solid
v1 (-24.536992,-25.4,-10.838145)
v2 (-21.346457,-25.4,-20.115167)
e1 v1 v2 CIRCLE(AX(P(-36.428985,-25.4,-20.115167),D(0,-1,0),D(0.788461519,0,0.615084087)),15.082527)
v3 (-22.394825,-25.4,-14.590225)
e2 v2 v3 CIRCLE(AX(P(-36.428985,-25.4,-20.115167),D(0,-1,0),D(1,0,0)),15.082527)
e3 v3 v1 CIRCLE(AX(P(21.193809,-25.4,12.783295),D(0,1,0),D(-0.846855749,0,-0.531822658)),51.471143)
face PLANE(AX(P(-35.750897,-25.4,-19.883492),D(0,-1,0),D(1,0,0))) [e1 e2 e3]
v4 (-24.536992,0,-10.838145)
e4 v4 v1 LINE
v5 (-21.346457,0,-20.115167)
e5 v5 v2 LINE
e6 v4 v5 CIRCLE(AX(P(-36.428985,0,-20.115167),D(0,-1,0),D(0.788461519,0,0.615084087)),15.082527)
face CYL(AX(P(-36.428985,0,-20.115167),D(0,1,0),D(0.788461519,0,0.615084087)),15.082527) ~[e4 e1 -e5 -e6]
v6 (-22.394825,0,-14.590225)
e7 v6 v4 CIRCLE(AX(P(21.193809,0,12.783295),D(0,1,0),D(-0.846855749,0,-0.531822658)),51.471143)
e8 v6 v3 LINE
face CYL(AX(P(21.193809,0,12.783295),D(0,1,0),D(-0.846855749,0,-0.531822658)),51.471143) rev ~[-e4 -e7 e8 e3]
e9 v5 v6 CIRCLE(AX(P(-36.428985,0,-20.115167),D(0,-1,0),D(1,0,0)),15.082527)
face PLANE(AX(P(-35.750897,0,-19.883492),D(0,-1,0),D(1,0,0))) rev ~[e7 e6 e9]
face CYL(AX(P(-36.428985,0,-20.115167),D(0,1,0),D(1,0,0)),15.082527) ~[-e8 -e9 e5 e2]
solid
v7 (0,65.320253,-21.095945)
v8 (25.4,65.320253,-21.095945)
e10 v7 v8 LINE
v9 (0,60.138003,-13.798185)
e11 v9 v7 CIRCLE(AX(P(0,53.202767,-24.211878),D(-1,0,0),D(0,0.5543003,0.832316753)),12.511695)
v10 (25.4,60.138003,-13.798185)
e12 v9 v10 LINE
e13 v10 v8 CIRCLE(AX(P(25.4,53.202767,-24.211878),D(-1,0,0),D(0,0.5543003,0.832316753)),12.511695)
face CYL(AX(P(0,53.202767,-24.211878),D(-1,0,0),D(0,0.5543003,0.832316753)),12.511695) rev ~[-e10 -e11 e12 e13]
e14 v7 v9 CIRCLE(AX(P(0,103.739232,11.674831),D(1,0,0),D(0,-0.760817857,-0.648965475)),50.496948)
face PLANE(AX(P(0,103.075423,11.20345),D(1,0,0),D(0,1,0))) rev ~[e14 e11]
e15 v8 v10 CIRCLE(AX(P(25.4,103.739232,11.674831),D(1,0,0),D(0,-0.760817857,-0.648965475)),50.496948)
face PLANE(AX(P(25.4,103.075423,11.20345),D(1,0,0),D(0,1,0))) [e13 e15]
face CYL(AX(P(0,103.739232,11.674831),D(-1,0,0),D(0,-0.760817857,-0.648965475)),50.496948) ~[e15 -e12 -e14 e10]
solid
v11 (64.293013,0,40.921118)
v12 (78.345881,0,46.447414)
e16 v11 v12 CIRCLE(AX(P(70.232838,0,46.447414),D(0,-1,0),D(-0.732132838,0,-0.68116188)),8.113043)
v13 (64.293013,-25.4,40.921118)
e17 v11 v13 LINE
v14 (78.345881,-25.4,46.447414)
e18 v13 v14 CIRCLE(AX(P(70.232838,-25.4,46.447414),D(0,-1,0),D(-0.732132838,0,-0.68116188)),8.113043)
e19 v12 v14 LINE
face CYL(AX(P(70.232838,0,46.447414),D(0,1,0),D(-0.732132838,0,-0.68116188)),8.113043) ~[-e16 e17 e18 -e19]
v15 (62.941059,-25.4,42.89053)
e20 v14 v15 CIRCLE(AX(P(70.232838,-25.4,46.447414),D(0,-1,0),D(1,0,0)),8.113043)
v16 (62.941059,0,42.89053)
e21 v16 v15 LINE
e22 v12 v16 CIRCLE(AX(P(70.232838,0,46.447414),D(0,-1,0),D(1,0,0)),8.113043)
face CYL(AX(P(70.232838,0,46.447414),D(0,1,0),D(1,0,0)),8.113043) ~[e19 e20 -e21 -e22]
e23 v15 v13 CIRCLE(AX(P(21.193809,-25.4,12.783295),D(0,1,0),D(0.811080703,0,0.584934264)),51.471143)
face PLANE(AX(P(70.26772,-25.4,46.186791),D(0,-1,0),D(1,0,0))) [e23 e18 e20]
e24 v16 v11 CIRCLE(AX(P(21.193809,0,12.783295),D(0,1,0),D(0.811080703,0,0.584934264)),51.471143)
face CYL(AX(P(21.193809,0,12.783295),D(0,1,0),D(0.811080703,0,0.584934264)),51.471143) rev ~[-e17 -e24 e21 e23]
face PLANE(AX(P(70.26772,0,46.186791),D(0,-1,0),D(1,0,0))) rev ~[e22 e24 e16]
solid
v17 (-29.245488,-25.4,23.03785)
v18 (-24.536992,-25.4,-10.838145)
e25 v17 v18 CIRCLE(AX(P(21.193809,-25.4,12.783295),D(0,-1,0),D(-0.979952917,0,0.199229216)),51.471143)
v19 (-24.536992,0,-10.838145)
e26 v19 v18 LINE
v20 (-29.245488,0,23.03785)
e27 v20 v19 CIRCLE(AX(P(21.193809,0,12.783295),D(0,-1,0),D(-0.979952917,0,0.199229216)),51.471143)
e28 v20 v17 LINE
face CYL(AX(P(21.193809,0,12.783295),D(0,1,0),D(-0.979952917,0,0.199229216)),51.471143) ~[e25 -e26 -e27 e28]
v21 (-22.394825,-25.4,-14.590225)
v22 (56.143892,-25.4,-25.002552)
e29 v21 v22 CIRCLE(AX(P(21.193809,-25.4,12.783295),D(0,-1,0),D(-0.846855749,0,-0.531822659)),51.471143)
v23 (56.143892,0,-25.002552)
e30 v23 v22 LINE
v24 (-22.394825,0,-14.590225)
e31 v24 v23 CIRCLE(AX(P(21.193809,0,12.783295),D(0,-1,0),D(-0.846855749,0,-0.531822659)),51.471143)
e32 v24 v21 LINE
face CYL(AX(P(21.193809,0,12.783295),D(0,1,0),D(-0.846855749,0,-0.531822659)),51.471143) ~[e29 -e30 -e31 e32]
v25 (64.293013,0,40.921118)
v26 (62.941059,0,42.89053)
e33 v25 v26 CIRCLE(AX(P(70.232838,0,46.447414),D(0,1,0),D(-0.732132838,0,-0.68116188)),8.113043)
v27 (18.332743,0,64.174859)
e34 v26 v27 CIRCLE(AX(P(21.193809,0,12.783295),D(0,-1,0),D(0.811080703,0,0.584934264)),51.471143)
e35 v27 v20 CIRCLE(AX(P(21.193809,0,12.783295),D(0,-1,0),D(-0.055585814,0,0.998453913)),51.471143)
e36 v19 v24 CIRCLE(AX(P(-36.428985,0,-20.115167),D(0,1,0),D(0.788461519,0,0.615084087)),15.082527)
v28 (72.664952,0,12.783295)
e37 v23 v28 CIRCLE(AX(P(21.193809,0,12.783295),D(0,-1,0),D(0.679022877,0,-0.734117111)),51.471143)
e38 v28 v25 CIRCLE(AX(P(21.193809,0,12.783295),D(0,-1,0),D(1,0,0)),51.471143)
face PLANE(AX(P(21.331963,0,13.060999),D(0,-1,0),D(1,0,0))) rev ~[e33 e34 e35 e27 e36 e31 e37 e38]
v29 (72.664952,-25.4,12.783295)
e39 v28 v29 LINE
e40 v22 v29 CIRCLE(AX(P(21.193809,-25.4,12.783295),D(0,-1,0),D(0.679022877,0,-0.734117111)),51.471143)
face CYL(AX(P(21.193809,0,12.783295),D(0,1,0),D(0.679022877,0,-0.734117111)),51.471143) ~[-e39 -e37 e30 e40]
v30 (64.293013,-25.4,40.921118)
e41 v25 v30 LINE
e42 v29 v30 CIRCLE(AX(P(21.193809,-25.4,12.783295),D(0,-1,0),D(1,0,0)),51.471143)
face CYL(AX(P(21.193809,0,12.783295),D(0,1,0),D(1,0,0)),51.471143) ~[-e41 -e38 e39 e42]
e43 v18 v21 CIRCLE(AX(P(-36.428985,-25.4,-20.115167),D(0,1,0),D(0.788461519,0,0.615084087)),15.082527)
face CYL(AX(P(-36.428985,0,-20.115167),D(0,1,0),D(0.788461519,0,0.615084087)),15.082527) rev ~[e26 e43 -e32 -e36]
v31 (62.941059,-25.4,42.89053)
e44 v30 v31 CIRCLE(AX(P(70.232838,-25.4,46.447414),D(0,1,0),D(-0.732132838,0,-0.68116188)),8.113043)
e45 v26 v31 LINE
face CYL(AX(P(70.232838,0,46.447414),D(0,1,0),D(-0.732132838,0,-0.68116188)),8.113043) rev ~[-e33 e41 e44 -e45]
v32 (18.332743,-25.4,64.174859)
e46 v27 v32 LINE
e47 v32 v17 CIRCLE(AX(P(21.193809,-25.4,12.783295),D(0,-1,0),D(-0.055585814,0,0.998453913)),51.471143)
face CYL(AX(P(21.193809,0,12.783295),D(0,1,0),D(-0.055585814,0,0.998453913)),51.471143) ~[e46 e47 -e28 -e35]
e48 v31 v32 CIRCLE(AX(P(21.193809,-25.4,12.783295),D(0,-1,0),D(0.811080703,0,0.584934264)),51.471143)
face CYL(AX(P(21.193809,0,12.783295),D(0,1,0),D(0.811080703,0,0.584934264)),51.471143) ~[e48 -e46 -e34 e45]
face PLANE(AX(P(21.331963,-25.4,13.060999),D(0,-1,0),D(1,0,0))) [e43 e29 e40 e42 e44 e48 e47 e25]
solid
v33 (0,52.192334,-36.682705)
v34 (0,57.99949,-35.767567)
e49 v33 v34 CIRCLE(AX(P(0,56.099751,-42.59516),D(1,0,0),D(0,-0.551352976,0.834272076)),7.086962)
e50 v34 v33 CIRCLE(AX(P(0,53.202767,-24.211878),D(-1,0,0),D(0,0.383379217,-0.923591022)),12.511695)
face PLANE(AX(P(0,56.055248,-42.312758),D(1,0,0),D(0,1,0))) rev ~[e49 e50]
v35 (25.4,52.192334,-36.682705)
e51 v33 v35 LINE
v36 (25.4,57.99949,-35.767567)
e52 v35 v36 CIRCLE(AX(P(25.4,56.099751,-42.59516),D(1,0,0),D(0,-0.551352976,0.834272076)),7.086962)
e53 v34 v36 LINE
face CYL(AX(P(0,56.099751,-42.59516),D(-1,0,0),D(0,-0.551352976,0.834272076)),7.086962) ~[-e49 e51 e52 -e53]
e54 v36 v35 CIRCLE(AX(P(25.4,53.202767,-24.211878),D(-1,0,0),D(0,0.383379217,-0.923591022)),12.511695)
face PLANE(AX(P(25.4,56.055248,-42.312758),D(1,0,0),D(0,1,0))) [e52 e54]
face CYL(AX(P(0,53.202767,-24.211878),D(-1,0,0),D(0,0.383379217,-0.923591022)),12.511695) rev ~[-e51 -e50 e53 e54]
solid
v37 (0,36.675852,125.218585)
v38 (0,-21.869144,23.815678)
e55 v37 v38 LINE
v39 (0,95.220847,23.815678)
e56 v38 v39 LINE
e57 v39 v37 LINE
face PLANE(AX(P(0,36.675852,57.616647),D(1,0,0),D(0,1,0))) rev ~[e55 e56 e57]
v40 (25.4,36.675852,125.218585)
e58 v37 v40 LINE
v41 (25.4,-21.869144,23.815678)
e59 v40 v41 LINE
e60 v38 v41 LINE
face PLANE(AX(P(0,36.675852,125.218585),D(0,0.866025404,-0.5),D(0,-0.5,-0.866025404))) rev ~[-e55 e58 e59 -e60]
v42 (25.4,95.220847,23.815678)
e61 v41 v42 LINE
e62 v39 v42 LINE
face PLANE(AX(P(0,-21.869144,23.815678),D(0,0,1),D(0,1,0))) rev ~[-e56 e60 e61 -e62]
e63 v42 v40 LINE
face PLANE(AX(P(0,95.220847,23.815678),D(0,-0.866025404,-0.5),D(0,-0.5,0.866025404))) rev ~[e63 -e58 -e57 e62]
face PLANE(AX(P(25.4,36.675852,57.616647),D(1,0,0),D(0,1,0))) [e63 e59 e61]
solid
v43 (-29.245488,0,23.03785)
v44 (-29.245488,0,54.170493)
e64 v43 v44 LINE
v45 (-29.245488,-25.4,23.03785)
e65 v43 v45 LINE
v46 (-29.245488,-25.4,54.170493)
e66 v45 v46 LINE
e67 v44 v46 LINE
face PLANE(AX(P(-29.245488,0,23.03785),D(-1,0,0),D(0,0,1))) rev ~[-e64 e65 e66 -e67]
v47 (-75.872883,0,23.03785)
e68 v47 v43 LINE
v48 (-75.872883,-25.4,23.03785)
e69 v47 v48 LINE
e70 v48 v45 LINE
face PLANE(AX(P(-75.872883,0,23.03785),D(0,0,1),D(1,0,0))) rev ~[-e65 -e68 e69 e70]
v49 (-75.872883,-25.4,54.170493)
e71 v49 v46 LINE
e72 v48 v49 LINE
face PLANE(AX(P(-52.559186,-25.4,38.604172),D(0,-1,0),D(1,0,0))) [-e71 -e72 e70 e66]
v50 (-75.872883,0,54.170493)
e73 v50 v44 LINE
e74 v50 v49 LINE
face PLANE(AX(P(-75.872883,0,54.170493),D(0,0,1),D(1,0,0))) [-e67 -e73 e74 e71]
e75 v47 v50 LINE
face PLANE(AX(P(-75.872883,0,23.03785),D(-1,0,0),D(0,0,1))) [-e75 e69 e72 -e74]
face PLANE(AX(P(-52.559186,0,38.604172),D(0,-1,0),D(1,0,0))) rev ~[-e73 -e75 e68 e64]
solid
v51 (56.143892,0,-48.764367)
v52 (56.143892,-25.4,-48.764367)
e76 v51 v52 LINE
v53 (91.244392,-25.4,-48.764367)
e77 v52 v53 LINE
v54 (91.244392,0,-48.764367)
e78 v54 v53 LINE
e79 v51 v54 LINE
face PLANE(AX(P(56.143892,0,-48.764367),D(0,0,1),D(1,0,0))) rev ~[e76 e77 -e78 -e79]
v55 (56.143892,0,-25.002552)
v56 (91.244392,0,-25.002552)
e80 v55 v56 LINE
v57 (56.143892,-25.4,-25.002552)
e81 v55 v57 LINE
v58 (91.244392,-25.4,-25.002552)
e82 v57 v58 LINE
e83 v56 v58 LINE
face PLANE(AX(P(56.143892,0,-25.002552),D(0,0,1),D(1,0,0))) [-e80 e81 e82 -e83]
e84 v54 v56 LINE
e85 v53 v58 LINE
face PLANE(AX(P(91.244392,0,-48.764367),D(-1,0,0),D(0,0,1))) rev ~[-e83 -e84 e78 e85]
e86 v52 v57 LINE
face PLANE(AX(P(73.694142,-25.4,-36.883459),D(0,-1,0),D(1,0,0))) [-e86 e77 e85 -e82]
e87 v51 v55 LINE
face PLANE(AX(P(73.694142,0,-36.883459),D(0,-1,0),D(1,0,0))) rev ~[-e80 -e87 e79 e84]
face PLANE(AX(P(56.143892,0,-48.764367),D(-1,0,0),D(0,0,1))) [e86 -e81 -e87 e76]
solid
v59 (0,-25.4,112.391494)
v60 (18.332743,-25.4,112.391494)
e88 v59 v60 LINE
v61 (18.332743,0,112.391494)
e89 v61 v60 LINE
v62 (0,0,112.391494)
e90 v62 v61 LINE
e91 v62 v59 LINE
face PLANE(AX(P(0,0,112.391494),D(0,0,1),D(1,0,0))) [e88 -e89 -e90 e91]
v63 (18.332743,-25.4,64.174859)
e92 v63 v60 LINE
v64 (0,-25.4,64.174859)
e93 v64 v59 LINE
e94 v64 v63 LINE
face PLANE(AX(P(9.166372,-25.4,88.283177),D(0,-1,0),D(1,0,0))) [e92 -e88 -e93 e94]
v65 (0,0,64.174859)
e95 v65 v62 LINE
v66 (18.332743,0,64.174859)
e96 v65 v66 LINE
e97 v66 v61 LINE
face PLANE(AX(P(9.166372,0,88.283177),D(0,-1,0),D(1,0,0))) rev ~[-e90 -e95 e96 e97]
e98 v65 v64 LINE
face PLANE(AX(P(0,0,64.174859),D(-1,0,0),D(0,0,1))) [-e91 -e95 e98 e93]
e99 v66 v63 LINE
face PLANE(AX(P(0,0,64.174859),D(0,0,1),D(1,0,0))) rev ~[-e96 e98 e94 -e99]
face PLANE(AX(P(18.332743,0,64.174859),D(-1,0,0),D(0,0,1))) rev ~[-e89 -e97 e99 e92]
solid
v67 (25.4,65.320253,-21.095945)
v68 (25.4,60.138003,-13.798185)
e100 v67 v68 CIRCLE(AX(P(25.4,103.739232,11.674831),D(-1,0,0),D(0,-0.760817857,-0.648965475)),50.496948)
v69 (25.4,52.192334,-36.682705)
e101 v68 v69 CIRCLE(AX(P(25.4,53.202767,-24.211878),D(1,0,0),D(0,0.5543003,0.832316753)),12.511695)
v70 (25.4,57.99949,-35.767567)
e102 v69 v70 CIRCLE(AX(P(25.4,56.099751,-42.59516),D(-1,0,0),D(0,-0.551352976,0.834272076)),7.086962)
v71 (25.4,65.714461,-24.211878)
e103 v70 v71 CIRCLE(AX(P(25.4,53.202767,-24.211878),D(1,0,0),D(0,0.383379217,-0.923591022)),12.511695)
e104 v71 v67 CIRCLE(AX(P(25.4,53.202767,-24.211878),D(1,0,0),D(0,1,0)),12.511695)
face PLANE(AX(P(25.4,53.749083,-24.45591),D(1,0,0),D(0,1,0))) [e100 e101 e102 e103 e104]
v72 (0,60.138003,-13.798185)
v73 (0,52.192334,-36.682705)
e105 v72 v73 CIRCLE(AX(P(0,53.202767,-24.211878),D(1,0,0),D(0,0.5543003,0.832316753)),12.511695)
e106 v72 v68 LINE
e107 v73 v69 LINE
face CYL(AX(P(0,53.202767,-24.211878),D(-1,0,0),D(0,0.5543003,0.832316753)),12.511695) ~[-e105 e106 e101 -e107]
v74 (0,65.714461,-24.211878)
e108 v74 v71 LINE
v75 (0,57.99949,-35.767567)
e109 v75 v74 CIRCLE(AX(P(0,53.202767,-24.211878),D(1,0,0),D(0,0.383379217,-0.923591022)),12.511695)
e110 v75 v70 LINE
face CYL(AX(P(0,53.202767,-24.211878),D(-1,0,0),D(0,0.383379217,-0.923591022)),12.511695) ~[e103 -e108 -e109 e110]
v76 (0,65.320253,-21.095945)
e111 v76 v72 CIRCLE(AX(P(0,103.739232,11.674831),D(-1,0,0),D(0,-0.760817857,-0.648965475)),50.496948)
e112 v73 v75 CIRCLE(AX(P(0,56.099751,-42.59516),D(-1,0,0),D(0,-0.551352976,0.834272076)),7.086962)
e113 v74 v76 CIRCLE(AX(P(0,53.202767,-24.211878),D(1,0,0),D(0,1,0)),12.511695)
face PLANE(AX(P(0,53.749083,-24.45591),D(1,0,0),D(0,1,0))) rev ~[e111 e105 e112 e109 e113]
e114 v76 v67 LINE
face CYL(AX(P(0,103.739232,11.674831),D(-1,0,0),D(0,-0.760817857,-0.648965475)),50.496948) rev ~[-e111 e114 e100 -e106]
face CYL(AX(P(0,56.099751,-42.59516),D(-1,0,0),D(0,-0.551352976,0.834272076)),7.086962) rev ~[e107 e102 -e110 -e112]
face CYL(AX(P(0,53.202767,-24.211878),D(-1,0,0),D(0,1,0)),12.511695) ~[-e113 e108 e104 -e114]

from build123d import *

# Parameters (mm, degrees)
F1_DEPTH = 25.4
F0_W     = 35.1004998692
F0_H     = 23.7618147956
F0_W_2   = 46.6273950725
F0_H_2   = 31.1326426156
F0_W_3   = 18.3327432124
F0_H_3   = 48.2166351118
F3_DEPTH = 25.4
F5_DEPTH = 25.4


with BuildPart() as f1:
    # F0 (on Front) → F1 (new body)
    with BuildSketch(Plane.XZ):
        with BuildLine():
            ThreePointArc((62.9410594702, 42.8905300796), (43.3588603902, 59.2374555897), (18.3327432124, 64.1748591027))
            ThreePointArc((18.3327432124, 64.1748591027), (-12.4706462623, 51.7189218261), (-29.2454881281, 23.0378504209))
            ThreePointArc((-29.2454881281, 23.0378504209), (-29.7872435834, 5.6973312725), (-24.536992326, -10.838144682))
            ThreePointArc((-24.536992326, -10.838144682), (-23.3308600115, -12.63708195), (-22.3948247731, -14.5902251825))
            ThreePointArc((-22.3948247731, -14.5902251825), (14.4291746764, -38.2413882223), (56.1438922278, -25.0025518609))
            ThreePointArc((56.1438922278, -25.0025518609), (68.3541696909, -7.8365718308), (72.6649516178, 12.7832949316))
            ThreePointArc((72.6649516178, 12.7832949316), (70.52758963, 27.4617353398), (64.2930134713, 40.9211182829))
            ThreePointArc((64.2930134713, 40.9211182829), (63.5441553551, 41.855793042), (62.9410594702, 42.8905300796))
        make_face()
    extrude(amount=F1_DEPTH)


with BuildPart() as f1b:
    # F0 (on Front) → F1, piece 2 (new body)
    with BuildSketch(Plane.XZ):
        with Locations((73.6941421624, -36.8834592587)):
            Rectangle(F0_W, F0_H)
    extrude(amount=F1_DEPTH)


with BuildPart() as f1c:
    # F0 (on Front) → F1, piece 3 (new body)
    with BuildSketch(Plane.XZ):
        with Locations((-52.5591856644, 38.6041717287)):
            Rectangle(F0_W_2, F0_H_2)
    extrude(amount=F1_DEPTH)


with BuildPart() as f1d:
    # F0 (on Front) → F1, piece 4 (new body)
    with BuildSketch(Plane.XZ):
        with Locations((9.1663716062, 88.2831766586)):
            Rectangle(F0_W_3, F0_H_3)
    extrude(amount=F1_DEPTH)


with BuildPart() as f1e:
    # F0 (on Front) → F1, piece 5 (new body)
    with BuildSketch(Plane.XZ):
        with BuildLine():
            ThreePointArc((78.3458810146, 46.4474136514), (68.4076058859, 54.3524744917), (62.9410594702, 42.8905300796))
            ThreePointArc((62.9410594702, 42.8905300796), (63.6284631724, 41.9136683381), (64.2930134713, 40.9211182829))
            ThreePointArc((64.2930134713, 40.9211182829), (73.2019635024, 38.8971979808), (78.3458810146, 46.4474136514))
        make_face()
    extrude(amount=F1_DEPTH)


with BuildPart() as f1f:
    # F0 (on Front) → F1, piece 6 (new body)
    with BuildSketch(Plane.XZ):
        with BuildLine():
            ThreePointArc((-22.3948247731, -14.5902251825), (-23.5052950028, -12.7366717585), (-24.536992326, -10.838144682))
            ThreePointArc((-24.536992326, -10.838144682), (-50.6915914862, -25.0203341449), (-21.3464574604, -20.1151670529))
            ThreePointArc((-21.3464574604, -20.1151670529), (-21.6108669498, -17.3034035185), (-22.3948247731, -14.5902251825))
        make_face()
    extrude(amount=F1_DEPTH)


with BuildPart() as f3:
    # F2 (on Right) → F3 (new body)
    with BuildSketch(Plane.YZ):
        with BuildLine():
            ThreePointArc((57.9994903279, -35.7675670337), (63.6084778415, -31.1590847227), (65.7144614914, -24.2118778735))
            ThreePointArc((65.7144614914, -24.2118778735), (65.6155180758, -22.6414926107), (65.3202527329, -21.0959447951))
            ThreePointArc((65.3202527329, -21.0959447951), (62.5671179416, -17.5621102816), (60.1380027846, -13.798184525))
            ThreePointArc((60.1380027846, -13.798184525), (41.3832425563, -20.1080546613), (52.192333573, -36.6827052986))
            ThreePointArc((52.192333573, -36.6827052986), (54.9965455414, -35.5945906676), (57.9994903279, -35.7675670337))
        make_face()
    extrude(amount=F3_DEPTH)


with BuildPart() as f3b:
    # F2 (on Right) → F3, piece 2 (new body)
    with BuildSketch(Plane.YZ):
        with BuildLine():
            ThreePointArc((60.1380027846, -13.798184525), (63.4040352976, -16.9678026085), (65.3202527329, -21.0959447951))
            ThreePointArc((65.3202527329, -21.0959447951), (121.2020574053, -35.7065100131), (154.2361799063, 11.6748308294))
            ThreePointArc((154.2361799063, 11.6748308294), (90.5442953395, 60.4173724355), (60.1380027846, -13.798184525))
        make_face()
    extrude(amount=F3_DEPTH)


with BuildPart() as f3c:
    # F2 (on Right) → F3, piece 3 (new body)
    with BuildSketch(Plane.YZ):
        with BuildLine():
            ThreePointArc((63.1867136248, -42.5951600476), (61.7428184579, -38.307873263), (57.9994903279, -35.7675670337))
            ThreePointArc((57.9994903279, -35.7675670337), (55.1504238642, -36.5710502649), (52.192333573, -36.6827052986))
            ThreePointArc((52.192333573, -36.6827052986), (52.7431673209, -48.8368247671), (63.1867136248, -42.5951600476))
        make_face()
    extrude(amount=F3_DEPTH)


with BuildPart() as f5:
    # F4 (on Right) → F5 (new body)
    with BuildSketch(Plane.YZ):
        Polygon((-21.8691436883, 23.8156784326), (95.2208472725, 23.8156784326), (36.6758517921, 125.2185851336), align=None)
    extrude(amount=F5_DEPTH)


solid = Compound([f1.part, f1b.part, f1c.part, f1d.part, f1e.part, f1f.part, f3.part, f3b.part, f3c.part, f5.part])
